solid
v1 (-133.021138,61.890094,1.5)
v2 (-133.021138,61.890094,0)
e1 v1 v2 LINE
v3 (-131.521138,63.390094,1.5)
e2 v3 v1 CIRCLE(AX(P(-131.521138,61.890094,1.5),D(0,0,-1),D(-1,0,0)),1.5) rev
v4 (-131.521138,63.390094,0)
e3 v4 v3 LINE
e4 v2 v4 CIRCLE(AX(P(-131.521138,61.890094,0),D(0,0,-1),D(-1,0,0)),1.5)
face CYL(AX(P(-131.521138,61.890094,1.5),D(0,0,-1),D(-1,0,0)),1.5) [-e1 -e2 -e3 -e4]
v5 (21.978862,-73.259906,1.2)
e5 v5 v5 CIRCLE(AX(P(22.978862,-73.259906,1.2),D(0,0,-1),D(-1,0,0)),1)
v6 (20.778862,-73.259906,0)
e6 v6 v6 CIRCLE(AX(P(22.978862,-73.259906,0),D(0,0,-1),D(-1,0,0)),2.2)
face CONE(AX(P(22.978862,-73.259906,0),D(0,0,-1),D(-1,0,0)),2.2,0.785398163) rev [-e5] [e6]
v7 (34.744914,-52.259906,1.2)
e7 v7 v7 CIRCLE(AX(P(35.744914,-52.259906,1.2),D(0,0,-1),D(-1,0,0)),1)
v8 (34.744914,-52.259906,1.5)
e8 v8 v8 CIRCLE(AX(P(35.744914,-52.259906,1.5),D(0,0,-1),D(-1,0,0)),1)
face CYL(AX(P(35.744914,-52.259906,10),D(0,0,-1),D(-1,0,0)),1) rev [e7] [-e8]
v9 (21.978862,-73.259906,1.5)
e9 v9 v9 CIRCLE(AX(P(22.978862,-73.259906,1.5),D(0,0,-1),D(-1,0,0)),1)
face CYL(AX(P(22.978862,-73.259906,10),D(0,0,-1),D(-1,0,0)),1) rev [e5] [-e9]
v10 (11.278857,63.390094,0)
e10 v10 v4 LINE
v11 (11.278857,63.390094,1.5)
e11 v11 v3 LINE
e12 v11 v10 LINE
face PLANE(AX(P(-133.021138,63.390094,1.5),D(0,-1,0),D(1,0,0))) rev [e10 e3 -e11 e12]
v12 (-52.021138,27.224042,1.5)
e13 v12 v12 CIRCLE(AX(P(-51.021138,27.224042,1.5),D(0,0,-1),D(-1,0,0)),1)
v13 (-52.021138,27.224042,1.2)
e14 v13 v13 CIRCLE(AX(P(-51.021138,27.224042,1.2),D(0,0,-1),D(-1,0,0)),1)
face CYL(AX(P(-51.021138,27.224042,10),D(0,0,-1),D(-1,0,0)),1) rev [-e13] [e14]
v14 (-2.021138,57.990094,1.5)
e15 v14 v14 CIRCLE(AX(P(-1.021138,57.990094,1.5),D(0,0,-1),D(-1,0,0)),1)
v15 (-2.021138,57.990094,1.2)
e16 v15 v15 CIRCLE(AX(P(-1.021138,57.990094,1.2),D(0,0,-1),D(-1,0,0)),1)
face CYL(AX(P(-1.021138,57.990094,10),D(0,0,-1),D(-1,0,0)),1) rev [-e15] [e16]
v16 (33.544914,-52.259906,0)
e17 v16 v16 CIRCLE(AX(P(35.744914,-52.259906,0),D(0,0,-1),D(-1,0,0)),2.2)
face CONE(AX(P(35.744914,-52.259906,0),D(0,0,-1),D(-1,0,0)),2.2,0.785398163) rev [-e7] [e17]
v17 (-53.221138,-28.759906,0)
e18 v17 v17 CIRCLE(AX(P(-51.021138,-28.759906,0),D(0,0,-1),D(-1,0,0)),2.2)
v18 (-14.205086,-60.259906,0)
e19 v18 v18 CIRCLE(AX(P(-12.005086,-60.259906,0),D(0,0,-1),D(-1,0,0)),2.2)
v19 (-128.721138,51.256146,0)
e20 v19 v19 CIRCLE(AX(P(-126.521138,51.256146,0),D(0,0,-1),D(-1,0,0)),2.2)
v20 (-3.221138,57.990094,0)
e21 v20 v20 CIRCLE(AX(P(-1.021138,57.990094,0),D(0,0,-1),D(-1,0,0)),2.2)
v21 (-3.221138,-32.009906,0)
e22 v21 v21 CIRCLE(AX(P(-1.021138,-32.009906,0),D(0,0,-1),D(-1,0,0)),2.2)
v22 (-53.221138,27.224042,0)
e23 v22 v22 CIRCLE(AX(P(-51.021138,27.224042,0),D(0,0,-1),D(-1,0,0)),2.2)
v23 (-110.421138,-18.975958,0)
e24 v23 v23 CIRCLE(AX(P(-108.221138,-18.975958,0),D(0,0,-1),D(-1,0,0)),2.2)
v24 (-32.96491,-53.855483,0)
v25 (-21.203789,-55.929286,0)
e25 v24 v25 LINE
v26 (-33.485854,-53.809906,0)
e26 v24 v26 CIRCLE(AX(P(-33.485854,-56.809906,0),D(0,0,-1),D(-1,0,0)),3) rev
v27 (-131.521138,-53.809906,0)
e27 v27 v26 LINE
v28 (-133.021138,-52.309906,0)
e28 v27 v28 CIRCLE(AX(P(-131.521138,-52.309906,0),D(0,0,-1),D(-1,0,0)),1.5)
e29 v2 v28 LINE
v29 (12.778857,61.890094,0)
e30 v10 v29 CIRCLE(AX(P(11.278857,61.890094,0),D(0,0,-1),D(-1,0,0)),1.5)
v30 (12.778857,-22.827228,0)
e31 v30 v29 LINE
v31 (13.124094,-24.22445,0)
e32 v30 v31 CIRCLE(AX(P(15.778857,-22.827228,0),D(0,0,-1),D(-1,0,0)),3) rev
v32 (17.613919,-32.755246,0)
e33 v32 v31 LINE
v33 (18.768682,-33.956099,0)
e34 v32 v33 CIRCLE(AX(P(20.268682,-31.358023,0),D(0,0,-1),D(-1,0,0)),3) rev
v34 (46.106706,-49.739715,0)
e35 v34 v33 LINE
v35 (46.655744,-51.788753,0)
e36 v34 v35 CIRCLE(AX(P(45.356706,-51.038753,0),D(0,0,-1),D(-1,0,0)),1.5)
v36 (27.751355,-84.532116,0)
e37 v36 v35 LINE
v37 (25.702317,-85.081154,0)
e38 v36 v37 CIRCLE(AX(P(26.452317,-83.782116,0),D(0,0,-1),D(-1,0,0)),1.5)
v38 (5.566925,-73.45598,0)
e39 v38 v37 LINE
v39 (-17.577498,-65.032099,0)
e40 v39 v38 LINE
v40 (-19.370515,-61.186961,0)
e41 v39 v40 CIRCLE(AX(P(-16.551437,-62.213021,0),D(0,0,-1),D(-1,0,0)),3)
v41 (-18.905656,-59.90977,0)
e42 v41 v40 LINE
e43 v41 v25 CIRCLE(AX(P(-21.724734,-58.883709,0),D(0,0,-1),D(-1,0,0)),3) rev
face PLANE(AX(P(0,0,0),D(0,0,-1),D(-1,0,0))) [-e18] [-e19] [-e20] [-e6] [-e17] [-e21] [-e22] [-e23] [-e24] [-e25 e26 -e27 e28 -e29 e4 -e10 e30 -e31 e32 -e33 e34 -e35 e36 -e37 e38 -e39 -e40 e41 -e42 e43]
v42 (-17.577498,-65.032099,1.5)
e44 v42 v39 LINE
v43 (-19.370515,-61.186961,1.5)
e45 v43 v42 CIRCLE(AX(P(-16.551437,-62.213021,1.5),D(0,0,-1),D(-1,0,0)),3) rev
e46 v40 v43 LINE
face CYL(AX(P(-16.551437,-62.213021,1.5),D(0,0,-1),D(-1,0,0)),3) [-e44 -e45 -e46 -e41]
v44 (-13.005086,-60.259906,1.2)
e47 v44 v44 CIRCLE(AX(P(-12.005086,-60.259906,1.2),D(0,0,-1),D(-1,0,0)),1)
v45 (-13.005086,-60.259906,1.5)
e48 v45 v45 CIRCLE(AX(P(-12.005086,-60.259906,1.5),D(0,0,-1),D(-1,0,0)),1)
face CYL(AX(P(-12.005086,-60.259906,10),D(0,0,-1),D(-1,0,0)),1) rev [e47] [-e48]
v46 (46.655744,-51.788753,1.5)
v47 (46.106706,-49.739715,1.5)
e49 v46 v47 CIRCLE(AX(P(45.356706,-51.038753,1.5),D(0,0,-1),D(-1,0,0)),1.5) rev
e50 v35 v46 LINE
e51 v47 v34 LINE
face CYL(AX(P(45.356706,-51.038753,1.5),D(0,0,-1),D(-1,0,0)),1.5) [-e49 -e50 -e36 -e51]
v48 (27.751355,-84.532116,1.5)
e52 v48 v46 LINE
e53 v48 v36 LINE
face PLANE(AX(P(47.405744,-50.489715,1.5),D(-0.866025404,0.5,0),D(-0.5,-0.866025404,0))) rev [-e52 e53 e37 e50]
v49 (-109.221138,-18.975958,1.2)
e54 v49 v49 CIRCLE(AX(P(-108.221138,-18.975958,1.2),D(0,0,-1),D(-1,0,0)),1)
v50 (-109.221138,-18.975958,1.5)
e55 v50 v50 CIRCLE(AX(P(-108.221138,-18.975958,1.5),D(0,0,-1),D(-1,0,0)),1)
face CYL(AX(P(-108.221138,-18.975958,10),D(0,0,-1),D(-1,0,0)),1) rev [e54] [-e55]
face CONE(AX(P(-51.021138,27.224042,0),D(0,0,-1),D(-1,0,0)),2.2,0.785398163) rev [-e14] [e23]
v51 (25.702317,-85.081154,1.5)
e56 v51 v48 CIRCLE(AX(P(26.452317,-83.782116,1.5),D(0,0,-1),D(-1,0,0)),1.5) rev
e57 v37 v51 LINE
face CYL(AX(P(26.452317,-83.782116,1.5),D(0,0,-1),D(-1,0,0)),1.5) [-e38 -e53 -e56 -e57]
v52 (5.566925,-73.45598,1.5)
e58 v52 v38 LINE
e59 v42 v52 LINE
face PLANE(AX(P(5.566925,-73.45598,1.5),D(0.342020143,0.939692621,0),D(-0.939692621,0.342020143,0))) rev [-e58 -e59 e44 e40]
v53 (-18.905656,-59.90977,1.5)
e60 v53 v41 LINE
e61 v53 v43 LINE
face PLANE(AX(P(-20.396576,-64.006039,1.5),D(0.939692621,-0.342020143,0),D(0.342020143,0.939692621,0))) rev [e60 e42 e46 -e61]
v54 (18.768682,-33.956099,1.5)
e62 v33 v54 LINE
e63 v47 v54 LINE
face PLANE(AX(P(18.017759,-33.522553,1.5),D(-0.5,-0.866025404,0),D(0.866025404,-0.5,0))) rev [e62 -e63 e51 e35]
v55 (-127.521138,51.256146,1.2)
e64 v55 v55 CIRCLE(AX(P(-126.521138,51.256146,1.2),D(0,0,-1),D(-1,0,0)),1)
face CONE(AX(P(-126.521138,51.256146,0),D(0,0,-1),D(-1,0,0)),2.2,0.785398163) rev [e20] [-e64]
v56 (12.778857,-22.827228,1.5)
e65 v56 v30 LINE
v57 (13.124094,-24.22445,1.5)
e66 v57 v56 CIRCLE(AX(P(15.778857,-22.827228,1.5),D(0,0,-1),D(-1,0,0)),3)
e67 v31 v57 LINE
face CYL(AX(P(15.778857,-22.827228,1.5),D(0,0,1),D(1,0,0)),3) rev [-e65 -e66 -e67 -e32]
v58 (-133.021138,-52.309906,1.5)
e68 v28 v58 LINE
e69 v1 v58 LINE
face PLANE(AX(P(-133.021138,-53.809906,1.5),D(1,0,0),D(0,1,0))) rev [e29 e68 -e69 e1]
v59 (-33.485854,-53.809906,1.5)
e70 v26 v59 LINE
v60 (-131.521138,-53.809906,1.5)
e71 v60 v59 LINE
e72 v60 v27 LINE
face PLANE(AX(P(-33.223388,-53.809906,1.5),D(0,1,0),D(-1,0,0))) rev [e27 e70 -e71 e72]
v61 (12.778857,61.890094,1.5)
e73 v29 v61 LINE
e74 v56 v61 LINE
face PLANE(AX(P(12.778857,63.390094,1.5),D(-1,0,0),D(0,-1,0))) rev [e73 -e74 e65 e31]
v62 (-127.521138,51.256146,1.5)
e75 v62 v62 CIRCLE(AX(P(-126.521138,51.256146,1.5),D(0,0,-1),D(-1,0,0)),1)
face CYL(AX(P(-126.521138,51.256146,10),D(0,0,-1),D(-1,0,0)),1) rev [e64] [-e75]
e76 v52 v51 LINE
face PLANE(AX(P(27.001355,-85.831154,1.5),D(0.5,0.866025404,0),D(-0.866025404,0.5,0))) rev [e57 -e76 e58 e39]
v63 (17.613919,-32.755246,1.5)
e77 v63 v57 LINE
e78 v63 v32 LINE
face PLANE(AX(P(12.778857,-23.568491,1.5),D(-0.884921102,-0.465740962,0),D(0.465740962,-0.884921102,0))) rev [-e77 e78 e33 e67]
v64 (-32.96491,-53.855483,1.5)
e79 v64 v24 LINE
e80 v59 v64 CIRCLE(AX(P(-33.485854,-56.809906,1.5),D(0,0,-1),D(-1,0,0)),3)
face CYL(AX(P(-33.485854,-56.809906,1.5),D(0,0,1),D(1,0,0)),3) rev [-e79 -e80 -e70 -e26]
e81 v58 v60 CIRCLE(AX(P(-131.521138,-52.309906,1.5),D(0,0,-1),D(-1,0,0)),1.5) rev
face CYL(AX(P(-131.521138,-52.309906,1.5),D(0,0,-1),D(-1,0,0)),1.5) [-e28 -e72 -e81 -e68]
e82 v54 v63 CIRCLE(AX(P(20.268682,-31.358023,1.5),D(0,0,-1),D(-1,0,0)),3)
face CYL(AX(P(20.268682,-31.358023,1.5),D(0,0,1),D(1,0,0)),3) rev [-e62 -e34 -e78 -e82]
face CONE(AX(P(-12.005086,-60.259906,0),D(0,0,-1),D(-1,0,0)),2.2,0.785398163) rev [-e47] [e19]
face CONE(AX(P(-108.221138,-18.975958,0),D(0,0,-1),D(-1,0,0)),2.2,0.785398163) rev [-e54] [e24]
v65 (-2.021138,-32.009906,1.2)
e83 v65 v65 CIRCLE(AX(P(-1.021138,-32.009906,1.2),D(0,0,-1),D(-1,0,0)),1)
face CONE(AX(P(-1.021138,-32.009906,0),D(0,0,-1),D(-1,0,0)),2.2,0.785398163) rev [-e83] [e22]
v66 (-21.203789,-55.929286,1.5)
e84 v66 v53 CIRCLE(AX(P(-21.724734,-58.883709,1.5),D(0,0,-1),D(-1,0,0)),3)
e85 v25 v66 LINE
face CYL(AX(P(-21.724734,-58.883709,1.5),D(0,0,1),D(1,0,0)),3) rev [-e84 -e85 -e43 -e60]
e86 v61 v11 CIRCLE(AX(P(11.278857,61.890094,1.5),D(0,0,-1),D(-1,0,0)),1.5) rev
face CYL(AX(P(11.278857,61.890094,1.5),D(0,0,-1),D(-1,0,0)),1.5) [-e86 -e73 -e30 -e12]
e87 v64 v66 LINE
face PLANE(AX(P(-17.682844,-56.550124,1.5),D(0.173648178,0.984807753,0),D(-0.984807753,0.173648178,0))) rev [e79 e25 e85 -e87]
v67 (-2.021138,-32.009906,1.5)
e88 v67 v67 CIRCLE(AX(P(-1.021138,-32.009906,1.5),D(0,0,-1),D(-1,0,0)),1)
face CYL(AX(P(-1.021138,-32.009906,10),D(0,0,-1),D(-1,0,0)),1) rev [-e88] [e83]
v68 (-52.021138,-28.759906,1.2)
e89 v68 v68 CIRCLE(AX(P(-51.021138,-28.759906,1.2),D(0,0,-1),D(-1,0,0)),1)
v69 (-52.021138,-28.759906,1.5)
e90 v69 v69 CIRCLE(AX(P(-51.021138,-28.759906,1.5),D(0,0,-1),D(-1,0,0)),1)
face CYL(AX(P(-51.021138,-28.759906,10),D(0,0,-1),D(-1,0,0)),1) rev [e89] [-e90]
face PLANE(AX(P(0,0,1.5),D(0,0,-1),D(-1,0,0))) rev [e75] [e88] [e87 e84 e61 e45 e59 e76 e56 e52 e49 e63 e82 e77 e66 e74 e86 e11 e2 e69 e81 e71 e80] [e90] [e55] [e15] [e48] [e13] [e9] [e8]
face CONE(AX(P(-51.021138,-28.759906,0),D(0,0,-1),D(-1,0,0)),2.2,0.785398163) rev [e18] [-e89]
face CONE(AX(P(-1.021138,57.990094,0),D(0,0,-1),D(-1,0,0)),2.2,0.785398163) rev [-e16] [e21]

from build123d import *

# Parameters (mm, degrees)
BOSS_EXTRUDE1_DEPTH = 1.5
SKETCH6_R           = 1
CUT_EXTRUDE1_DEPTH  = 10
FILLET4_R           = 1.5
FILLET5_R           = 3


# Read off the part's stored shape, not the designer's step: AdvancedHole1
with BuildPart() as part:
    # Sketch1 → Boss-Extrude1 (new body)
    with BuildSketch(Plane.XY):
        Polygon((-133.021138037, 63.390093572), (12.778856844, 63.390093572), (12.778856844, -23.568490874), (18.017758559, -33.522553443), (47.405744057, -50.489714781), (27.001354783, -85.831153701), (5.566925134, -73.455979973), (-20.396575573, -64.006038538), (-17.68284447, -56.550123611), (-33.223388364, -53.809906428), (-133.021138037, -53.809906428), align=None)
    extrude(amount=BOSS_EXTRUDE1_DEPTH)

    # Sketch6 → Cut-Extrude1 (cut)
    with BuildSketch(Plane(origin=(0, 0, 0), x_dir=(-1, 0, 0), z_dir=(0, 0, -1))):
        with Locations((126.521138037, 51.256145572)):
            Circle(SKETCH6_R)
        with Locations((108.221138037, -18.975958428)):
            Circle(SKETCH6_R)
        with Locations((51.021138037, -28.759906428)):
            Circle(SKETCH6_R)
        with Locations((51.021138037, 27.224041572)):
            Circle(SKETCH6_R)
        with Locations((1.021138037, 57.990093572)):
            Circle(SKETCH6_R)
        with Locations((1.021138037, -32.009906428)):
            Circle(SKETCH6_R)
        with Locations((12.005086037, -60.259906428)):
            Circle(SKETCH6_R)
        with Locations((-35.744913963, -52.259906428)):
            Circle(SKETCH6_R)
        with Locations((-22.978861963, -73.259906428)):
            Circle(SKETCH6_R)
    extrude(amount=-CUT_EXTRUDE1_DEPTH, mode=Mode.SUBTRACT)

    # AdvancedHole1 outline → AdvancedHole1 (revolve, cut)
    with BuildSketch(Plane(origin=(35.744913963, -52.259906428, 0), x_dir=(1, 0, 0), z_dir=(0, -1, 0))):
        Polygon((2.2, 0), (1, 1.2), (1, 0), align=None)
    revolve(axis=Axis((35.744913963, -52.259906428, 0), (0, 0, 1)), mode=Mode.SUBTRACT)

    # AdvancedHole1 2 outline → AdvancedHole1 2 (revolve, cut)
    with BuildSketch(Plane(origin=(22.978861963, -73.259906428, 0), x_dir=(1, 0, 0), z_dir=(0, -1, 0))):
        Polygon((2.2, 0), (1, 1.2), (1, 0), align=None)
    revolve(axis=Axis((22.978861963, -73.259906428, 0), (0, 0, 1)), mode=Mode.SUBTRACT)

    # AdvancedHole1 3 outline → AdvancedHole1 3 (revolve, cut)
    with BuildSketch(Plane(origin=(-12.005086037, -60.259906428, 0), x_dir=(1, 0, 0), z_dir=(0, -1, 0))):
        Polygon((2.2, 0), (1, 1.2), (1, 0), align=None)
    revolve(axis=Axis((-12.005086037, -60.259906428, 0), (0, 0, 1)), mode=Mode.SUBTRACT)

    # AdvancedHole1 4 outline → AdvancedHole1 4 (revolve, cut)
    with BuildSketch(Plane(origin=(-1.021138037, -32.009906428, 0), x_dir=(1, 0, 0), z_dir=(0, -1, 0))):
        Polygon((2.2, 0), (1, 1.2), (1, 0), align=None)
    revolve(axis=Axis((-1.021138037, -32.009906428, 0), (0, 0, 1)), mode=Mode.SUBTRACT)

    # AdvancedHole1 5 outline → AdvancedHole1 5 (revolve, cut)
    with BuildSketch(Plane(origin=(-51.021138037, -28.759906428, 0), x_dir=(1, 0, 0), z_dir=(0, -1, 0))):
        Polygon((2.2, 0), (1, 1.2), (1, 0), align=None)
    revolve(axis=Axis((-51.021138037, -28.759906428, 0), (0, 0, 1)), mode=Mode.SUBTRACT)

    # AdvancedHole1 6 outline → AdvancedHole1 6 (revolve, cut)
    with BuildSketch(Plane(origin=(-108.221138037, -18.975958428, 0), x_dir=(1, 0, 0), z_dir=(0, -1, 0))):
        Polygon((2.2, 0), (1, 1.2), (1, 0), align=None)
    revolve(axis=Axis((-108.221138037, -18.975958428, 0), (0, 0, 1)), mode=Mode.SUBTRACT)

    # AdvancedHole1 7 outline → AdvancedHole1 7 (revolve, cut)
    with BuildSketch(Plane(origin=(-126.521138037, 51.256145572, 0), x_dir=(1, 0, 0), z_dir=(0, -1, 0))):
        Polygon((2.2, 0), (1, 1.2), (1, 0), align=None)
    revolve(axis=Axis((-126.521138037, 51.256145572, 0), (0, 0, 1)), mode=Mode.SUBTRACT)

    # AdvancedHole1 8 outline → AdvancedHole1 8 (revolve, cut)
    with BuildSketch(Plane(origin=(-51.021138037, 27.224041572, 0), x_dir=(1, 0, 0), z_dir=(0, -1, 0))):
        Polygon((2.2, 0), (1, 1.2), (1, 0), align=None)
    revolve(axis=Axis((-51.021138037, 27.224041572, 0), (0, 0, 1)), mode=Mode.SUBTRACT)

    # AdvancedHole1 9 outline → AdvancedHole1 9 (revolve, cut)
    with BuildSketch(Plane(origin=(-1.021138037, 57.990093572, 0), x_dir=(1, 0, 0), z_dir=(0, -1, 0))):
        Polygon((2.2, 0), (1, 1.2), (1, 0), align=None)
    revolve(axis=Axis((-1.021138037, 57.990093572, 0), (0, 0, 1)), mode=Mode.SUBTRACT)

    # Fillet4
    fillet4_edges = [part.edges().sort_by_distance(p)[0] for p in [
        (-133.021138037, 63.390093572, 0.75),
        (12.778856844, 63.390093572, 0.75),
        (47.405744057, -50.489714781, 0.75),
        (27.001354783, -85.831153701, 0.75),
        (-133.021138037, -53.809906428, 0.75),
    ]]
    fillet(fillet4_edges, radius=FILLET4_R)

    # Fillet5
    fillet5_edges = [part.edges().sort_by_distance(p)[0] for p in [
        (12.778856844, -23.568490874, 0.75),
        (18.017758559, -33.522553443, 0.75),
        (-20.396575573, -64.006038538, 0.75),
        (-17.68284447, -56.550123611, 0.75),
        (-33.223388364, -53.809906428, 0.75),
    ]]
    fillet(fillet5_edges, radius=FILLET5_R)


solid = part.part
